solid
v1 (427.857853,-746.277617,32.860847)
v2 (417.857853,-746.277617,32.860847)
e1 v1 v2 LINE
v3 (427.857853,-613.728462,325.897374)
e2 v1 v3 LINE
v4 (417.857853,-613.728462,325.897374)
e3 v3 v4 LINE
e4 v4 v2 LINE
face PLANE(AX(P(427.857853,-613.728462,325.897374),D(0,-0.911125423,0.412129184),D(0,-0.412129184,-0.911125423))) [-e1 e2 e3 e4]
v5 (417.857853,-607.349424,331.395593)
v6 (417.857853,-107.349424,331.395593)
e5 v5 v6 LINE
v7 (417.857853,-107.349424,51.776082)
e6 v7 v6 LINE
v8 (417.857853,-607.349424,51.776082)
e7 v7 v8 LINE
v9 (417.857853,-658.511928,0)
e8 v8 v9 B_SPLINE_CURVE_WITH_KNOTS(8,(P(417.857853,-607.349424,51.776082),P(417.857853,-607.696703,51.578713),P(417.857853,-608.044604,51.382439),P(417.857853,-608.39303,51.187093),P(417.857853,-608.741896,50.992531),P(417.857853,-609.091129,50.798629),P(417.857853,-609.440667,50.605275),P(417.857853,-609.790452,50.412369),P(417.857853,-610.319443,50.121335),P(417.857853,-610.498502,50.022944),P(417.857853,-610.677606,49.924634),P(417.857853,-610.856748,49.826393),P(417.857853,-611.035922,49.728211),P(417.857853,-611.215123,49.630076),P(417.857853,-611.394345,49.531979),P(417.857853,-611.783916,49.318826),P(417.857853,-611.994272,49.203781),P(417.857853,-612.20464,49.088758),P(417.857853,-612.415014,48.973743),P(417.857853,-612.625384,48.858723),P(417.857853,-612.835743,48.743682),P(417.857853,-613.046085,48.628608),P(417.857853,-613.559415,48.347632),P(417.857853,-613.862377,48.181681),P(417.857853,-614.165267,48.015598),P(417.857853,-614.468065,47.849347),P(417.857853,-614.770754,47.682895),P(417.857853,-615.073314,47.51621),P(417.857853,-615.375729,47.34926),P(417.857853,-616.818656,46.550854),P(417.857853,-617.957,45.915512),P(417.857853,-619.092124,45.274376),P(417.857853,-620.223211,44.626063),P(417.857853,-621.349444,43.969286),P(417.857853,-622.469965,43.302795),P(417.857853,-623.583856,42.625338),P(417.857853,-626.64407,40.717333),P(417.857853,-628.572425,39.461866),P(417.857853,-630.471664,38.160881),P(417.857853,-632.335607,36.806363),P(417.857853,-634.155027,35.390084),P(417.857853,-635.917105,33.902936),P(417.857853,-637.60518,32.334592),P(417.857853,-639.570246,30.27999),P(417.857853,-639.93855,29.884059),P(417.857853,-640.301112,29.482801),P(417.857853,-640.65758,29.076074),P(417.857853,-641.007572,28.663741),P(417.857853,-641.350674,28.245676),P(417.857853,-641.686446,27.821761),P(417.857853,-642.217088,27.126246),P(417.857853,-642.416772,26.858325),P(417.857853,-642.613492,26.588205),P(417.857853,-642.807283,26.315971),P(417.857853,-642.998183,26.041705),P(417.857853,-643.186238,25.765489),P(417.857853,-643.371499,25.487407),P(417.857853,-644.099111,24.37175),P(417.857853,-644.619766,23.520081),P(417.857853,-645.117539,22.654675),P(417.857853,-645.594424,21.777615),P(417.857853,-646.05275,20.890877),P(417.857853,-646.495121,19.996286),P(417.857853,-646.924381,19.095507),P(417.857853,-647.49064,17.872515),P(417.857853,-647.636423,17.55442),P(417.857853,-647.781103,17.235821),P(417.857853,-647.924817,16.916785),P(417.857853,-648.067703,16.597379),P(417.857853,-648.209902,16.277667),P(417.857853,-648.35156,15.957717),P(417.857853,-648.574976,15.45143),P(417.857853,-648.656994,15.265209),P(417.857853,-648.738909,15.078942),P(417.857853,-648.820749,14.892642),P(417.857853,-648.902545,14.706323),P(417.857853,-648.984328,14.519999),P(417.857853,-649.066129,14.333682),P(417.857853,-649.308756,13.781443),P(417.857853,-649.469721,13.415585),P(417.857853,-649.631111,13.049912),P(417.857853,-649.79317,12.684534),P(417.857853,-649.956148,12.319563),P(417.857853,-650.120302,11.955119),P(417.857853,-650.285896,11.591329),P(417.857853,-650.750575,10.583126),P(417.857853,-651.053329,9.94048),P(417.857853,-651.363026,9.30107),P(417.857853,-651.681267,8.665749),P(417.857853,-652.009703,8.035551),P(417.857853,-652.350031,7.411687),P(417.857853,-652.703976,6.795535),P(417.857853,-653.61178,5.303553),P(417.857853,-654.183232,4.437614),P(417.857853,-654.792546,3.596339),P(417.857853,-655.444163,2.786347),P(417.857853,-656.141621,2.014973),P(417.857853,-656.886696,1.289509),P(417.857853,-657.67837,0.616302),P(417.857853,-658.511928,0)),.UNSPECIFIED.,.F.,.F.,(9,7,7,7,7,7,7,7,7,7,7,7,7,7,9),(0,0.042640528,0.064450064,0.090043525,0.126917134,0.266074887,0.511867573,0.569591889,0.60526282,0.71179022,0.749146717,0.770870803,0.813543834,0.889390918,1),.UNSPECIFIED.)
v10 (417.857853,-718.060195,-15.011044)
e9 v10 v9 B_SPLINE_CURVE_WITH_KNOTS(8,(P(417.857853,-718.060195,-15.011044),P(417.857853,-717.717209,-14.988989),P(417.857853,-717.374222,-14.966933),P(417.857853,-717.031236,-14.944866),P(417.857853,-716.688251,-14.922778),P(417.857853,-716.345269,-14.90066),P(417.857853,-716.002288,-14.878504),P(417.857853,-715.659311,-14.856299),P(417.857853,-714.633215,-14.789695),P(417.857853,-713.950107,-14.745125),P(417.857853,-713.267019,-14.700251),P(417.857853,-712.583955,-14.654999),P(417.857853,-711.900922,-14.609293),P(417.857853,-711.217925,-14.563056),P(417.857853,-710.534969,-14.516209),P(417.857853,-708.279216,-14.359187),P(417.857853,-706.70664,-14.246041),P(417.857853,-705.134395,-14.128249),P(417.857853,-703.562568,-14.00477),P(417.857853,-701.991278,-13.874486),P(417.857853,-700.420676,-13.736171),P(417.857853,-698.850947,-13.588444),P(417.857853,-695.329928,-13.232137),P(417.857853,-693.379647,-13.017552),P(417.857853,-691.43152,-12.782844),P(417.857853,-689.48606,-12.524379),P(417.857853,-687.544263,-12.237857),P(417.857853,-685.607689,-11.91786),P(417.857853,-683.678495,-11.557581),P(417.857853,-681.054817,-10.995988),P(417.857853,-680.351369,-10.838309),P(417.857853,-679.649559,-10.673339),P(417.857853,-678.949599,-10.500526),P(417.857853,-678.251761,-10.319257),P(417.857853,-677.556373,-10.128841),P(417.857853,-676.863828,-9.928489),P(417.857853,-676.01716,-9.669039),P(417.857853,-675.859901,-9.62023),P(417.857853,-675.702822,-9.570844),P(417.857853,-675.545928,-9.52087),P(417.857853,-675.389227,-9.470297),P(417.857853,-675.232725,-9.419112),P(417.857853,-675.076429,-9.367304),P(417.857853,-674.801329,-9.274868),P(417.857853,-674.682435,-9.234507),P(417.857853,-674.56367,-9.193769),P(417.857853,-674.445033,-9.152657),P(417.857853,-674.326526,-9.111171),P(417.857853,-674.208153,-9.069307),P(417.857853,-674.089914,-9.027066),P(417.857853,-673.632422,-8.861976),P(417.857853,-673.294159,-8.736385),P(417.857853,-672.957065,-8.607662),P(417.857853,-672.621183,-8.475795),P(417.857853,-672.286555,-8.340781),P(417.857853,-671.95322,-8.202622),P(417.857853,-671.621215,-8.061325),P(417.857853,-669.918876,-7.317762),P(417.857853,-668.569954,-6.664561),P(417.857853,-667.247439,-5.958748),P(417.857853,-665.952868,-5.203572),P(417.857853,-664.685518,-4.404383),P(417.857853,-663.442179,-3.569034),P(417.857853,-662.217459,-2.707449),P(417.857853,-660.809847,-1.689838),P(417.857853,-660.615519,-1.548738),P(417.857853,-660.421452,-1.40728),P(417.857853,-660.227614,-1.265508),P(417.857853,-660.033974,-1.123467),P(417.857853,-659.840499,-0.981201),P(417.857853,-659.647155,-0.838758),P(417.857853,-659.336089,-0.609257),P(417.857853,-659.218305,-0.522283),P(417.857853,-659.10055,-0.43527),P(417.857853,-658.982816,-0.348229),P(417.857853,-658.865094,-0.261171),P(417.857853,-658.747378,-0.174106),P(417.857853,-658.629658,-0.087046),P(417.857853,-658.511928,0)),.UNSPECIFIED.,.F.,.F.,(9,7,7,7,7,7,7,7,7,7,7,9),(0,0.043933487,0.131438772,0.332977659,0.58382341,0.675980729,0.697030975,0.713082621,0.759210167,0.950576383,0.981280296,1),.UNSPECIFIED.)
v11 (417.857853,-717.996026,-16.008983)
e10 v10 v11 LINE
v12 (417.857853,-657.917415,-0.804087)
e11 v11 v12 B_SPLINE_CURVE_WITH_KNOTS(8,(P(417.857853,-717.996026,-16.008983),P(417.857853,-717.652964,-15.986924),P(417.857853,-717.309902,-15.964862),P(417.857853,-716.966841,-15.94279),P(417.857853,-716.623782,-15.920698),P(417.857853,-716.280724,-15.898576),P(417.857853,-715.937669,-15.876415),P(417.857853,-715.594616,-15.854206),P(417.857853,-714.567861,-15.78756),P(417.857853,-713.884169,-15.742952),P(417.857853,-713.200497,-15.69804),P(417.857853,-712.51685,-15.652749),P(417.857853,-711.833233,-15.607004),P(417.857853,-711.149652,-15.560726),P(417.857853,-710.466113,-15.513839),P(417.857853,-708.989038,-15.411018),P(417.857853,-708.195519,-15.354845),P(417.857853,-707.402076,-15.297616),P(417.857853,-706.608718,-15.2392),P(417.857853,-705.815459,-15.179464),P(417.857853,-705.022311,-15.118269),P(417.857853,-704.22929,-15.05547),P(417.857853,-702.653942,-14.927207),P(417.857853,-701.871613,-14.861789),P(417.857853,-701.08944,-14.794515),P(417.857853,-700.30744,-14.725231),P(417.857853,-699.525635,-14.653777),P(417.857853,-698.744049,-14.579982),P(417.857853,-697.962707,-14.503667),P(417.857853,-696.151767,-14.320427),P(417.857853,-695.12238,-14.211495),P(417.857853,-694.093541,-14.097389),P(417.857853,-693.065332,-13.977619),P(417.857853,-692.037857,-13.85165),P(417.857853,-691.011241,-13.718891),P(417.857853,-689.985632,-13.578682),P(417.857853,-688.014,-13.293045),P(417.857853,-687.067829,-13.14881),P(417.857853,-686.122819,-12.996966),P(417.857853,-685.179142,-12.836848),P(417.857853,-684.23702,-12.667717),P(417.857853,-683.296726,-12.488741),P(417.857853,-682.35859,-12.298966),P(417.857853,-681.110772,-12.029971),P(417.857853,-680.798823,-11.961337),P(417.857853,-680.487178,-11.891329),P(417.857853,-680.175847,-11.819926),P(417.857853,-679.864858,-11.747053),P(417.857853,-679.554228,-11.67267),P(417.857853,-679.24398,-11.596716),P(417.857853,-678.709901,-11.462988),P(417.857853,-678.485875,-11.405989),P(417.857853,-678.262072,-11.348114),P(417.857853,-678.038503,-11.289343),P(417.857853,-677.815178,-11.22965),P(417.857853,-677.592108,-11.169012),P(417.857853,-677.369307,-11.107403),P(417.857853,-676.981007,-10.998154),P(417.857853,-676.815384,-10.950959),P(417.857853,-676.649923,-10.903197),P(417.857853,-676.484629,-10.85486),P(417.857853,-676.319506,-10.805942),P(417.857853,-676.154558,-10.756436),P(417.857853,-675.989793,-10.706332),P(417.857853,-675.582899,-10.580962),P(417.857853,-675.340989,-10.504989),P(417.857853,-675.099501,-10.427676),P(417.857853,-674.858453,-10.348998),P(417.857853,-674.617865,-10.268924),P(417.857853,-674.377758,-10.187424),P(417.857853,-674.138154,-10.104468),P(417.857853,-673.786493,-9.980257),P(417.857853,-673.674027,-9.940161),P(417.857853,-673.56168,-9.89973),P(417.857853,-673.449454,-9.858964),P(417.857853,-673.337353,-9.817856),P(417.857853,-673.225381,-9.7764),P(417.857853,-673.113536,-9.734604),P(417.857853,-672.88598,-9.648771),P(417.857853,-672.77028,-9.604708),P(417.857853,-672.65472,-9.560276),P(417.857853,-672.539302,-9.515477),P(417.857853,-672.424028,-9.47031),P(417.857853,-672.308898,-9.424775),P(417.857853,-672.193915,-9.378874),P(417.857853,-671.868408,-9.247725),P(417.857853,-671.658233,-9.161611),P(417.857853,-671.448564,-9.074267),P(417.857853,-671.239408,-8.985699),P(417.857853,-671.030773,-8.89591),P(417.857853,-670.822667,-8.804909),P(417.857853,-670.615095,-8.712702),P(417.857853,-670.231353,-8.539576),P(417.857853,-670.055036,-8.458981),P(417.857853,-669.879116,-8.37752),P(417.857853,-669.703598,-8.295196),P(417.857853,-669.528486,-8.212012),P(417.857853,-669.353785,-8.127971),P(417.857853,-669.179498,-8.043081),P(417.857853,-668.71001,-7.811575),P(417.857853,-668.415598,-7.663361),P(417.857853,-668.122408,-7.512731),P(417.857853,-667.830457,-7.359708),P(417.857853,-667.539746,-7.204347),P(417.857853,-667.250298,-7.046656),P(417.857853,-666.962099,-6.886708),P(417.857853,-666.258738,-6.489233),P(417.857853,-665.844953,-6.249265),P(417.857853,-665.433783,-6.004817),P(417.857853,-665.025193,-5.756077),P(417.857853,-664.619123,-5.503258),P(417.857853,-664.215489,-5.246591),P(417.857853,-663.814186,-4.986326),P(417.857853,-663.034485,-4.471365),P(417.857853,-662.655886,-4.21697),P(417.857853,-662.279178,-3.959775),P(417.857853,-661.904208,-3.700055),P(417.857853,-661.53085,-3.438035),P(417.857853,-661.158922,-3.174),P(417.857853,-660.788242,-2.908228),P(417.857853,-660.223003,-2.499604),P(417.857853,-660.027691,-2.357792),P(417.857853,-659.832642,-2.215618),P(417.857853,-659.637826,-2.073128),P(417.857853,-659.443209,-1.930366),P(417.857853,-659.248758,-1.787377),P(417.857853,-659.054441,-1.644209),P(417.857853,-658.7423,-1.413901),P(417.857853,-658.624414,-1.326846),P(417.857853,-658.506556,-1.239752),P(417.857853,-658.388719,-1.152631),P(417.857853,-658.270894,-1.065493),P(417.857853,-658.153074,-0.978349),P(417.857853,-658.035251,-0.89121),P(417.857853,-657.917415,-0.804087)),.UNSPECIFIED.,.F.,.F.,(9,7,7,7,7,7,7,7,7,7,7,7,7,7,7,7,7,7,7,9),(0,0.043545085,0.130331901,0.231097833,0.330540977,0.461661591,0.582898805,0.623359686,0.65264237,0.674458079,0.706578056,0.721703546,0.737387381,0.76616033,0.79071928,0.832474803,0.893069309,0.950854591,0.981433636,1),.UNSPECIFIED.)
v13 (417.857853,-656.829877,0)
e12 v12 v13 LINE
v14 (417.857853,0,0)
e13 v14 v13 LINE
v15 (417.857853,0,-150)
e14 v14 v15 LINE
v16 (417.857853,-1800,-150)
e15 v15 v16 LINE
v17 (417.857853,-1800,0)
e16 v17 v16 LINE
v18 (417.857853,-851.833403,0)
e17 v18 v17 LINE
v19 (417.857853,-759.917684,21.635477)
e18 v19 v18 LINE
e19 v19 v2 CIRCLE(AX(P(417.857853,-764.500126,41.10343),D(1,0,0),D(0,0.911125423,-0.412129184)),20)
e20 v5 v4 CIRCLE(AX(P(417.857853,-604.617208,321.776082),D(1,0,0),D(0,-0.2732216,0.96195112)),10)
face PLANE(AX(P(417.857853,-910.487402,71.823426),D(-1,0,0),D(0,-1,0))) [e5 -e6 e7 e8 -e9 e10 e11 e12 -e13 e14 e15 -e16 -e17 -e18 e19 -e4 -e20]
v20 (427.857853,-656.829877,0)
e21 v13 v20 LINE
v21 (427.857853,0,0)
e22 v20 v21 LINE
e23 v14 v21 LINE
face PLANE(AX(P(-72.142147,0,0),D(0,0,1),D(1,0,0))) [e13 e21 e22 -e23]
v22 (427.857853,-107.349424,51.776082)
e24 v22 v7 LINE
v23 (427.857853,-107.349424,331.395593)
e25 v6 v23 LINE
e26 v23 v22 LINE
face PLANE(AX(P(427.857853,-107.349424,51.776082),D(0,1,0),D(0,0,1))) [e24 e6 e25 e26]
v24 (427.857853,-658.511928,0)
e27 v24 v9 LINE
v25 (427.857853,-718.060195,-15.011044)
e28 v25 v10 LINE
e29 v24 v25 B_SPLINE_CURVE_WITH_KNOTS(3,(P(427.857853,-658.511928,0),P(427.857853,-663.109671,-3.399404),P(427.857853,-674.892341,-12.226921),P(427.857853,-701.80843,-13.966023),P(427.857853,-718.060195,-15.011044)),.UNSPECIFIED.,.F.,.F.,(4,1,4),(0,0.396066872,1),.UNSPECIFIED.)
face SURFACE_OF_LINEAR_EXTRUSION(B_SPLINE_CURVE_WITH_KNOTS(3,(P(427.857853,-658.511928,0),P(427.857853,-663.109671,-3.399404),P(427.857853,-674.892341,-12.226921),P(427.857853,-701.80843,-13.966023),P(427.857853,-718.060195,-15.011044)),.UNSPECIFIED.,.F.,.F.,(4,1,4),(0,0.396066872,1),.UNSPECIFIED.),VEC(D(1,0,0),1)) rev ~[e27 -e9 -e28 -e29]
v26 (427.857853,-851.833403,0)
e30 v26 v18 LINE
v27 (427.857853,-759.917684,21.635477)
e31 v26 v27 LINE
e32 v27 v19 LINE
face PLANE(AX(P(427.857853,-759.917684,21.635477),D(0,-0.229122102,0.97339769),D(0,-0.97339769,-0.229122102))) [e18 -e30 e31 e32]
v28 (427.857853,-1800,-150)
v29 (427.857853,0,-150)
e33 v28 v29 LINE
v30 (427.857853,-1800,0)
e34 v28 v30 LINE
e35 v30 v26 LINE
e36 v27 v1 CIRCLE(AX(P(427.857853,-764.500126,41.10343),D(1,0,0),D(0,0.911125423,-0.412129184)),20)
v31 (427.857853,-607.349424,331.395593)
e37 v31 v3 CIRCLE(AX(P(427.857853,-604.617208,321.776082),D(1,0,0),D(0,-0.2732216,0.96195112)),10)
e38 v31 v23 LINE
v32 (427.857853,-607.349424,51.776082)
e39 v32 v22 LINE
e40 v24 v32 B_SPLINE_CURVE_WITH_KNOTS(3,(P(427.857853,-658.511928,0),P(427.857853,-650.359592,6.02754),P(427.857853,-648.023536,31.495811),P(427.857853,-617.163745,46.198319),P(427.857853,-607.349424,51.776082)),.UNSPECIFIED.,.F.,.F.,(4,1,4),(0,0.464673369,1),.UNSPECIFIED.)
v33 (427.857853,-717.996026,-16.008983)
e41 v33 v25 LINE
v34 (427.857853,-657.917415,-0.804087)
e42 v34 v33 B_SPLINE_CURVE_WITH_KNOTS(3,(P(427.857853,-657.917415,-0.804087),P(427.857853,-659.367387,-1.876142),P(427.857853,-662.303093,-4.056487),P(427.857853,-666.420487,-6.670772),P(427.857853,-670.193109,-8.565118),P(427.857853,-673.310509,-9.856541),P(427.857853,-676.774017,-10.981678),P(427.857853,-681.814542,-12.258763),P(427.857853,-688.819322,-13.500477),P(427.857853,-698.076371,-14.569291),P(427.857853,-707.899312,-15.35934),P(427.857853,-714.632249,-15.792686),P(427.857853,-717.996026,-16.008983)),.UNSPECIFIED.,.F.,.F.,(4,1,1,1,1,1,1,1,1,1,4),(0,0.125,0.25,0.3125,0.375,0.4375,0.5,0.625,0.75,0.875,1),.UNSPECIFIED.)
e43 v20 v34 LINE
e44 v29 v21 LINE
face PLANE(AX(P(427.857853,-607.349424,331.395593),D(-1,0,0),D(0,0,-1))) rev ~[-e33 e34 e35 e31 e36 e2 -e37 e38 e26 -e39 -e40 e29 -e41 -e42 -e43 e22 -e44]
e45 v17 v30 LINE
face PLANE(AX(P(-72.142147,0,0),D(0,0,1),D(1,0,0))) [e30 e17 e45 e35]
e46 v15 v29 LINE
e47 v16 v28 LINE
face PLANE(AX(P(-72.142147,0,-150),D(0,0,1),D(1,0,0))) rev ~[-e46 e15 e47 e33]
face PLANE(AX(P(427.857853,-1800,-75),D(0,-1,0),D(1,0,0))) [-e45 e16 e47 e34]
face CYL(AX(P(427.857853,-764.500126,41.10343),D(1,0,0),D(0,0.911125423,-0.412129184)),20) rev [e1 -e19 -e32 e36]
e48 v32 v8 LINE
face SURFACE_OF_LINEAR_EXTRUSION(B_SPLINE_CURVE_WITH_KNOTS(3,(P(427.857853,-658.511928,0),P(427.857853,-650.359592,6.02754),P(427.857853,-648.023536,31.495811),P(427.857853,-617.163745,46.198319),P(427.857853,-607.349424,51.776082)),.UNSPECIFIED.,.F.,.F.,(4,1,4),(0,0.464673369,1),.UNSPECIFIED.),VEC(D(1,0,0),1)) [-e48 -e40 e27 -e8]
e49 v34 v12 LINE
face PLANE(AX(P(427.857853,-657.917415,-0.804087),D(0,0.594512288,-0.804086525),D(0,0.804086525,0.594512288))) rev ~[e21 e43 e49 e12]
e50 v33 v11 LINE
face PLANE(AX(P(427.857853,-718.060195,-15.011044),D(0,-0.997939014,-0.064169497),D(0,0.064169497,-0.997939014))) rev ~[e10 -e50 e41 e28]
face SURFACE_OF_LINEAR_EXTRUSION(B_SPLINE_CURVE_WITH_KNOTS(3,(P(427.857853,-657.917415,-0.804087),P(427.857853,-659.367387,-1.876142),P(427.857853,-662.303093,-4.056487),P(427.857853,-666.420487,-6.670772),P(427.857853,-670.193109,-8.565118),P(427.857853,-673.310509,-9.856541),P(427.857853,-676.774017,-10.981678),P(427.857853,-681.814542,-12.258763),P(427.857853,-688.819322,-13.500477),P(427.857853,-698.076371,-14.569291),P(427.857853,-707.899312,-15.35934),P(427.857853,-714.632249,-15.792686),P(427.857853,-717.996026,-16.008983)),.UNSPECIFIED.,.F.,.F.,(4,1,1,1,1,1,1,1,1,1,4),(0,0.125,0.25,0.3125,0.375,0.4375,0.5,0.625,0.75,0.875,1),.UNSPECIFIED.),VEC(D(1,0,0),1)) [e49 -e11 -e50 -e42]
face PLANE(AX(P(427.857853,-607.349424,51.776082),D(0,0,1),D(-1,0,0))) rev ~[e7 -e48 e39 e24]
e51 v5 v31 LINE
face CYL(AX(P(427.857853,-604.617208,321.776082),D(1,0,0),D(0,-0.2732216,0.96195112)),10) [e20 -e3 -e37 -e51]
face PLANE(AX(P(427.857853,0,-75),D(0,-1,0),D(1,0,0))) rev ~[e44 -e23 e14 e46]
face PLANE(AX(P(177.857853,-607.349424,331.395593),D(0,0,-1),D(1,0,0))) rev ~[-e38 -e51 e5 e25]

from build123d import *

# Parameters (mm, degrees)
F0_W      = 1000
F0_H      = 150
F1_DEPTH  = 1800
F5_DEPTH  = 250
F7_DEPTH  = 250
F8_W      = 1814.4553899765
F8_H      = 676.3893961906
F9_DEPTH  = 500
F10_DEPTH = 500
F11_W     = 1876.0774359107
F11_H     = 584.96324718
F12_DEPTH = 490


# Not quite as in the source:
# - the dataset's text gives a spline's control points without its knots; the knots are read off the source's solid


with BuildPart() as f1:
    # F0 (on Front) → F1 (new body)
    with BuildSketch(Plane.XZ):
        with Locations((427.8578534722, -75)):
            Rectangle(F0_W, F0_H)
    extrude(amount=F1_DEPTH)

    # F4 (on plane+point) → F5 (join, symmetric)
    with BuildSketch(Plane.YZ.offset(427.8578534722)):
        with BuildLine():
            add(Edge.make_bspline(
                [(-658.5119275224, 0), (-663.1096709351, -3.3994040102), (-674.8923410513, -12.2269214906), (-701.8084297627, -13.9660228128), (-718.060195446, -15.0110442191)],
                knots=[0, 0, 0, 0, 0.3960668718, 1, 1, 1, 1], degree=3))
            add(Edge.make_bspline(
                [(-658.5119275224, 0), (-650.3595915647, 6.0275402647), (-648.0235359943, 31.4958112046), (-617.163744576, 46.1983191108), (-607.3494242193, 51.7760817812)],
                knots=[0, 0, 0, 0, 0.4646733695, 1, 1, 1, 1], degree=3))
            Line((-607.3494242193, 51.7760817812), (-607.3494242193, 331.3955929823))
            ThreePointArc((-607.3494242193, 331.3955929823), (-611.1459562468, 329.3507401392), (-613.7284624486, 325.8973736217))
            Line((-613.7284624486, 325.8973736217), (-746.2776173449, 32.8608466306))
            ThreePointArc((-746.2776173449, 32.8608466306), (-751.7911260188, 25.6605897485), (-759.9176837495, 21.6354765186))
            Line((-759.9176837495, 21.6354765186), (-851.8334031105, 0))
            Line((-851.8334031105, 0), (-724.4437932968, 0))
            Line((-724.4437932968, 0), (-718.060195446, -15.0110442191))
        make_face()
    extrude(amount=F5_DEPTH, both=True)

    # F6 (on plane+point) → F7 (cut, symmetric)
    with BuildSketch(Plane.YZ.offset(427.8578534722)):
        with BuildLine():
            add(Edge.make_bspline(
                [(-657.9174152342, -0.8040865247), (-659.3673865445, -1.8761424975), (-662.3030933204, -4.0564869069), (-666.4204873665, -6.6707717939), (-670.1931092733, -8.5651184529), (-673.3105086069, -9.8565410415), (-676.7740170416, -10.9816784698), (-681.8145421149, -12.2587633506), (-688.8193216778, -13.5004768766), (-698.0763714753, -14.5692911085), (-707.8993120937, -15.3593398489), (-714.632248917, -15.792685566), (-717.9960259489, -16.0089832331)],
                knots=[0, 0, 0, 0, 0.125, 0.25, 0.3125, 0.375, 0.4375, 0.5, 0.625, 0.75, 0.875, 1, 1, 1, 1], degree=3))
            Line((-657.9174152342, -0.8040865247), (-656.8298765035, 0))
            Line((-656.8298765035, 0), (-658.5119275224, 0))
            add(Edge.make_bspline(
                [(-658.5119275224, 0), (-663.1096709351, -3.3994040102), (-674.8923410513, -12.2269214906), (-701.8084297627, -13.9660228128), (-718.060195446, -15.0110442191)],
                knots=[0, 0, 0, 0, 0.3960668718, 1, 1, 1, 1], degree=3))
            Line((-718.060195446, -15.0110442191), (-717.9960259489, -16.0089832331))
        make_face()
    extrude(amount=F7_DEPTH, both=True, mode=Mode.SUBTRACT)

    # F8 (on plane+point) → F9 (cut, through all)
    with BuildSketch(Plane.YZ.offset(427.8578534722)):
        with Locations((-907.2276949883, 182.6078593731)):
            Rectangle(F8_W, F8_H)
    extrude(amount=F9_DEPTH, mode=Mode.SUBTRACT)

    # F10 (add): a face of the model
    f10_faces = [f1.faces().sort_by_distance(p)[0] for p in [
        (302.8578534722, -607.3494242193, 191.5858373818),
    ]]
    extrude(f10_faces, amount=F10_DEPTH)

    # F11 (on face) → F12 (cut)
    with BuildSketch(Plane(origin=(-72.1421465278, 0, 0), x_dir=(0, -1, 0), z_dir=(-1, 0, 0))):
        with Locations((910.4874022305, 71.823425591)):
            Rectangle(F11_W, F11_H)
    extrude(amount=-F12_DEPTH, mode=Mode.SUBTRACT)


solid = f1.part
